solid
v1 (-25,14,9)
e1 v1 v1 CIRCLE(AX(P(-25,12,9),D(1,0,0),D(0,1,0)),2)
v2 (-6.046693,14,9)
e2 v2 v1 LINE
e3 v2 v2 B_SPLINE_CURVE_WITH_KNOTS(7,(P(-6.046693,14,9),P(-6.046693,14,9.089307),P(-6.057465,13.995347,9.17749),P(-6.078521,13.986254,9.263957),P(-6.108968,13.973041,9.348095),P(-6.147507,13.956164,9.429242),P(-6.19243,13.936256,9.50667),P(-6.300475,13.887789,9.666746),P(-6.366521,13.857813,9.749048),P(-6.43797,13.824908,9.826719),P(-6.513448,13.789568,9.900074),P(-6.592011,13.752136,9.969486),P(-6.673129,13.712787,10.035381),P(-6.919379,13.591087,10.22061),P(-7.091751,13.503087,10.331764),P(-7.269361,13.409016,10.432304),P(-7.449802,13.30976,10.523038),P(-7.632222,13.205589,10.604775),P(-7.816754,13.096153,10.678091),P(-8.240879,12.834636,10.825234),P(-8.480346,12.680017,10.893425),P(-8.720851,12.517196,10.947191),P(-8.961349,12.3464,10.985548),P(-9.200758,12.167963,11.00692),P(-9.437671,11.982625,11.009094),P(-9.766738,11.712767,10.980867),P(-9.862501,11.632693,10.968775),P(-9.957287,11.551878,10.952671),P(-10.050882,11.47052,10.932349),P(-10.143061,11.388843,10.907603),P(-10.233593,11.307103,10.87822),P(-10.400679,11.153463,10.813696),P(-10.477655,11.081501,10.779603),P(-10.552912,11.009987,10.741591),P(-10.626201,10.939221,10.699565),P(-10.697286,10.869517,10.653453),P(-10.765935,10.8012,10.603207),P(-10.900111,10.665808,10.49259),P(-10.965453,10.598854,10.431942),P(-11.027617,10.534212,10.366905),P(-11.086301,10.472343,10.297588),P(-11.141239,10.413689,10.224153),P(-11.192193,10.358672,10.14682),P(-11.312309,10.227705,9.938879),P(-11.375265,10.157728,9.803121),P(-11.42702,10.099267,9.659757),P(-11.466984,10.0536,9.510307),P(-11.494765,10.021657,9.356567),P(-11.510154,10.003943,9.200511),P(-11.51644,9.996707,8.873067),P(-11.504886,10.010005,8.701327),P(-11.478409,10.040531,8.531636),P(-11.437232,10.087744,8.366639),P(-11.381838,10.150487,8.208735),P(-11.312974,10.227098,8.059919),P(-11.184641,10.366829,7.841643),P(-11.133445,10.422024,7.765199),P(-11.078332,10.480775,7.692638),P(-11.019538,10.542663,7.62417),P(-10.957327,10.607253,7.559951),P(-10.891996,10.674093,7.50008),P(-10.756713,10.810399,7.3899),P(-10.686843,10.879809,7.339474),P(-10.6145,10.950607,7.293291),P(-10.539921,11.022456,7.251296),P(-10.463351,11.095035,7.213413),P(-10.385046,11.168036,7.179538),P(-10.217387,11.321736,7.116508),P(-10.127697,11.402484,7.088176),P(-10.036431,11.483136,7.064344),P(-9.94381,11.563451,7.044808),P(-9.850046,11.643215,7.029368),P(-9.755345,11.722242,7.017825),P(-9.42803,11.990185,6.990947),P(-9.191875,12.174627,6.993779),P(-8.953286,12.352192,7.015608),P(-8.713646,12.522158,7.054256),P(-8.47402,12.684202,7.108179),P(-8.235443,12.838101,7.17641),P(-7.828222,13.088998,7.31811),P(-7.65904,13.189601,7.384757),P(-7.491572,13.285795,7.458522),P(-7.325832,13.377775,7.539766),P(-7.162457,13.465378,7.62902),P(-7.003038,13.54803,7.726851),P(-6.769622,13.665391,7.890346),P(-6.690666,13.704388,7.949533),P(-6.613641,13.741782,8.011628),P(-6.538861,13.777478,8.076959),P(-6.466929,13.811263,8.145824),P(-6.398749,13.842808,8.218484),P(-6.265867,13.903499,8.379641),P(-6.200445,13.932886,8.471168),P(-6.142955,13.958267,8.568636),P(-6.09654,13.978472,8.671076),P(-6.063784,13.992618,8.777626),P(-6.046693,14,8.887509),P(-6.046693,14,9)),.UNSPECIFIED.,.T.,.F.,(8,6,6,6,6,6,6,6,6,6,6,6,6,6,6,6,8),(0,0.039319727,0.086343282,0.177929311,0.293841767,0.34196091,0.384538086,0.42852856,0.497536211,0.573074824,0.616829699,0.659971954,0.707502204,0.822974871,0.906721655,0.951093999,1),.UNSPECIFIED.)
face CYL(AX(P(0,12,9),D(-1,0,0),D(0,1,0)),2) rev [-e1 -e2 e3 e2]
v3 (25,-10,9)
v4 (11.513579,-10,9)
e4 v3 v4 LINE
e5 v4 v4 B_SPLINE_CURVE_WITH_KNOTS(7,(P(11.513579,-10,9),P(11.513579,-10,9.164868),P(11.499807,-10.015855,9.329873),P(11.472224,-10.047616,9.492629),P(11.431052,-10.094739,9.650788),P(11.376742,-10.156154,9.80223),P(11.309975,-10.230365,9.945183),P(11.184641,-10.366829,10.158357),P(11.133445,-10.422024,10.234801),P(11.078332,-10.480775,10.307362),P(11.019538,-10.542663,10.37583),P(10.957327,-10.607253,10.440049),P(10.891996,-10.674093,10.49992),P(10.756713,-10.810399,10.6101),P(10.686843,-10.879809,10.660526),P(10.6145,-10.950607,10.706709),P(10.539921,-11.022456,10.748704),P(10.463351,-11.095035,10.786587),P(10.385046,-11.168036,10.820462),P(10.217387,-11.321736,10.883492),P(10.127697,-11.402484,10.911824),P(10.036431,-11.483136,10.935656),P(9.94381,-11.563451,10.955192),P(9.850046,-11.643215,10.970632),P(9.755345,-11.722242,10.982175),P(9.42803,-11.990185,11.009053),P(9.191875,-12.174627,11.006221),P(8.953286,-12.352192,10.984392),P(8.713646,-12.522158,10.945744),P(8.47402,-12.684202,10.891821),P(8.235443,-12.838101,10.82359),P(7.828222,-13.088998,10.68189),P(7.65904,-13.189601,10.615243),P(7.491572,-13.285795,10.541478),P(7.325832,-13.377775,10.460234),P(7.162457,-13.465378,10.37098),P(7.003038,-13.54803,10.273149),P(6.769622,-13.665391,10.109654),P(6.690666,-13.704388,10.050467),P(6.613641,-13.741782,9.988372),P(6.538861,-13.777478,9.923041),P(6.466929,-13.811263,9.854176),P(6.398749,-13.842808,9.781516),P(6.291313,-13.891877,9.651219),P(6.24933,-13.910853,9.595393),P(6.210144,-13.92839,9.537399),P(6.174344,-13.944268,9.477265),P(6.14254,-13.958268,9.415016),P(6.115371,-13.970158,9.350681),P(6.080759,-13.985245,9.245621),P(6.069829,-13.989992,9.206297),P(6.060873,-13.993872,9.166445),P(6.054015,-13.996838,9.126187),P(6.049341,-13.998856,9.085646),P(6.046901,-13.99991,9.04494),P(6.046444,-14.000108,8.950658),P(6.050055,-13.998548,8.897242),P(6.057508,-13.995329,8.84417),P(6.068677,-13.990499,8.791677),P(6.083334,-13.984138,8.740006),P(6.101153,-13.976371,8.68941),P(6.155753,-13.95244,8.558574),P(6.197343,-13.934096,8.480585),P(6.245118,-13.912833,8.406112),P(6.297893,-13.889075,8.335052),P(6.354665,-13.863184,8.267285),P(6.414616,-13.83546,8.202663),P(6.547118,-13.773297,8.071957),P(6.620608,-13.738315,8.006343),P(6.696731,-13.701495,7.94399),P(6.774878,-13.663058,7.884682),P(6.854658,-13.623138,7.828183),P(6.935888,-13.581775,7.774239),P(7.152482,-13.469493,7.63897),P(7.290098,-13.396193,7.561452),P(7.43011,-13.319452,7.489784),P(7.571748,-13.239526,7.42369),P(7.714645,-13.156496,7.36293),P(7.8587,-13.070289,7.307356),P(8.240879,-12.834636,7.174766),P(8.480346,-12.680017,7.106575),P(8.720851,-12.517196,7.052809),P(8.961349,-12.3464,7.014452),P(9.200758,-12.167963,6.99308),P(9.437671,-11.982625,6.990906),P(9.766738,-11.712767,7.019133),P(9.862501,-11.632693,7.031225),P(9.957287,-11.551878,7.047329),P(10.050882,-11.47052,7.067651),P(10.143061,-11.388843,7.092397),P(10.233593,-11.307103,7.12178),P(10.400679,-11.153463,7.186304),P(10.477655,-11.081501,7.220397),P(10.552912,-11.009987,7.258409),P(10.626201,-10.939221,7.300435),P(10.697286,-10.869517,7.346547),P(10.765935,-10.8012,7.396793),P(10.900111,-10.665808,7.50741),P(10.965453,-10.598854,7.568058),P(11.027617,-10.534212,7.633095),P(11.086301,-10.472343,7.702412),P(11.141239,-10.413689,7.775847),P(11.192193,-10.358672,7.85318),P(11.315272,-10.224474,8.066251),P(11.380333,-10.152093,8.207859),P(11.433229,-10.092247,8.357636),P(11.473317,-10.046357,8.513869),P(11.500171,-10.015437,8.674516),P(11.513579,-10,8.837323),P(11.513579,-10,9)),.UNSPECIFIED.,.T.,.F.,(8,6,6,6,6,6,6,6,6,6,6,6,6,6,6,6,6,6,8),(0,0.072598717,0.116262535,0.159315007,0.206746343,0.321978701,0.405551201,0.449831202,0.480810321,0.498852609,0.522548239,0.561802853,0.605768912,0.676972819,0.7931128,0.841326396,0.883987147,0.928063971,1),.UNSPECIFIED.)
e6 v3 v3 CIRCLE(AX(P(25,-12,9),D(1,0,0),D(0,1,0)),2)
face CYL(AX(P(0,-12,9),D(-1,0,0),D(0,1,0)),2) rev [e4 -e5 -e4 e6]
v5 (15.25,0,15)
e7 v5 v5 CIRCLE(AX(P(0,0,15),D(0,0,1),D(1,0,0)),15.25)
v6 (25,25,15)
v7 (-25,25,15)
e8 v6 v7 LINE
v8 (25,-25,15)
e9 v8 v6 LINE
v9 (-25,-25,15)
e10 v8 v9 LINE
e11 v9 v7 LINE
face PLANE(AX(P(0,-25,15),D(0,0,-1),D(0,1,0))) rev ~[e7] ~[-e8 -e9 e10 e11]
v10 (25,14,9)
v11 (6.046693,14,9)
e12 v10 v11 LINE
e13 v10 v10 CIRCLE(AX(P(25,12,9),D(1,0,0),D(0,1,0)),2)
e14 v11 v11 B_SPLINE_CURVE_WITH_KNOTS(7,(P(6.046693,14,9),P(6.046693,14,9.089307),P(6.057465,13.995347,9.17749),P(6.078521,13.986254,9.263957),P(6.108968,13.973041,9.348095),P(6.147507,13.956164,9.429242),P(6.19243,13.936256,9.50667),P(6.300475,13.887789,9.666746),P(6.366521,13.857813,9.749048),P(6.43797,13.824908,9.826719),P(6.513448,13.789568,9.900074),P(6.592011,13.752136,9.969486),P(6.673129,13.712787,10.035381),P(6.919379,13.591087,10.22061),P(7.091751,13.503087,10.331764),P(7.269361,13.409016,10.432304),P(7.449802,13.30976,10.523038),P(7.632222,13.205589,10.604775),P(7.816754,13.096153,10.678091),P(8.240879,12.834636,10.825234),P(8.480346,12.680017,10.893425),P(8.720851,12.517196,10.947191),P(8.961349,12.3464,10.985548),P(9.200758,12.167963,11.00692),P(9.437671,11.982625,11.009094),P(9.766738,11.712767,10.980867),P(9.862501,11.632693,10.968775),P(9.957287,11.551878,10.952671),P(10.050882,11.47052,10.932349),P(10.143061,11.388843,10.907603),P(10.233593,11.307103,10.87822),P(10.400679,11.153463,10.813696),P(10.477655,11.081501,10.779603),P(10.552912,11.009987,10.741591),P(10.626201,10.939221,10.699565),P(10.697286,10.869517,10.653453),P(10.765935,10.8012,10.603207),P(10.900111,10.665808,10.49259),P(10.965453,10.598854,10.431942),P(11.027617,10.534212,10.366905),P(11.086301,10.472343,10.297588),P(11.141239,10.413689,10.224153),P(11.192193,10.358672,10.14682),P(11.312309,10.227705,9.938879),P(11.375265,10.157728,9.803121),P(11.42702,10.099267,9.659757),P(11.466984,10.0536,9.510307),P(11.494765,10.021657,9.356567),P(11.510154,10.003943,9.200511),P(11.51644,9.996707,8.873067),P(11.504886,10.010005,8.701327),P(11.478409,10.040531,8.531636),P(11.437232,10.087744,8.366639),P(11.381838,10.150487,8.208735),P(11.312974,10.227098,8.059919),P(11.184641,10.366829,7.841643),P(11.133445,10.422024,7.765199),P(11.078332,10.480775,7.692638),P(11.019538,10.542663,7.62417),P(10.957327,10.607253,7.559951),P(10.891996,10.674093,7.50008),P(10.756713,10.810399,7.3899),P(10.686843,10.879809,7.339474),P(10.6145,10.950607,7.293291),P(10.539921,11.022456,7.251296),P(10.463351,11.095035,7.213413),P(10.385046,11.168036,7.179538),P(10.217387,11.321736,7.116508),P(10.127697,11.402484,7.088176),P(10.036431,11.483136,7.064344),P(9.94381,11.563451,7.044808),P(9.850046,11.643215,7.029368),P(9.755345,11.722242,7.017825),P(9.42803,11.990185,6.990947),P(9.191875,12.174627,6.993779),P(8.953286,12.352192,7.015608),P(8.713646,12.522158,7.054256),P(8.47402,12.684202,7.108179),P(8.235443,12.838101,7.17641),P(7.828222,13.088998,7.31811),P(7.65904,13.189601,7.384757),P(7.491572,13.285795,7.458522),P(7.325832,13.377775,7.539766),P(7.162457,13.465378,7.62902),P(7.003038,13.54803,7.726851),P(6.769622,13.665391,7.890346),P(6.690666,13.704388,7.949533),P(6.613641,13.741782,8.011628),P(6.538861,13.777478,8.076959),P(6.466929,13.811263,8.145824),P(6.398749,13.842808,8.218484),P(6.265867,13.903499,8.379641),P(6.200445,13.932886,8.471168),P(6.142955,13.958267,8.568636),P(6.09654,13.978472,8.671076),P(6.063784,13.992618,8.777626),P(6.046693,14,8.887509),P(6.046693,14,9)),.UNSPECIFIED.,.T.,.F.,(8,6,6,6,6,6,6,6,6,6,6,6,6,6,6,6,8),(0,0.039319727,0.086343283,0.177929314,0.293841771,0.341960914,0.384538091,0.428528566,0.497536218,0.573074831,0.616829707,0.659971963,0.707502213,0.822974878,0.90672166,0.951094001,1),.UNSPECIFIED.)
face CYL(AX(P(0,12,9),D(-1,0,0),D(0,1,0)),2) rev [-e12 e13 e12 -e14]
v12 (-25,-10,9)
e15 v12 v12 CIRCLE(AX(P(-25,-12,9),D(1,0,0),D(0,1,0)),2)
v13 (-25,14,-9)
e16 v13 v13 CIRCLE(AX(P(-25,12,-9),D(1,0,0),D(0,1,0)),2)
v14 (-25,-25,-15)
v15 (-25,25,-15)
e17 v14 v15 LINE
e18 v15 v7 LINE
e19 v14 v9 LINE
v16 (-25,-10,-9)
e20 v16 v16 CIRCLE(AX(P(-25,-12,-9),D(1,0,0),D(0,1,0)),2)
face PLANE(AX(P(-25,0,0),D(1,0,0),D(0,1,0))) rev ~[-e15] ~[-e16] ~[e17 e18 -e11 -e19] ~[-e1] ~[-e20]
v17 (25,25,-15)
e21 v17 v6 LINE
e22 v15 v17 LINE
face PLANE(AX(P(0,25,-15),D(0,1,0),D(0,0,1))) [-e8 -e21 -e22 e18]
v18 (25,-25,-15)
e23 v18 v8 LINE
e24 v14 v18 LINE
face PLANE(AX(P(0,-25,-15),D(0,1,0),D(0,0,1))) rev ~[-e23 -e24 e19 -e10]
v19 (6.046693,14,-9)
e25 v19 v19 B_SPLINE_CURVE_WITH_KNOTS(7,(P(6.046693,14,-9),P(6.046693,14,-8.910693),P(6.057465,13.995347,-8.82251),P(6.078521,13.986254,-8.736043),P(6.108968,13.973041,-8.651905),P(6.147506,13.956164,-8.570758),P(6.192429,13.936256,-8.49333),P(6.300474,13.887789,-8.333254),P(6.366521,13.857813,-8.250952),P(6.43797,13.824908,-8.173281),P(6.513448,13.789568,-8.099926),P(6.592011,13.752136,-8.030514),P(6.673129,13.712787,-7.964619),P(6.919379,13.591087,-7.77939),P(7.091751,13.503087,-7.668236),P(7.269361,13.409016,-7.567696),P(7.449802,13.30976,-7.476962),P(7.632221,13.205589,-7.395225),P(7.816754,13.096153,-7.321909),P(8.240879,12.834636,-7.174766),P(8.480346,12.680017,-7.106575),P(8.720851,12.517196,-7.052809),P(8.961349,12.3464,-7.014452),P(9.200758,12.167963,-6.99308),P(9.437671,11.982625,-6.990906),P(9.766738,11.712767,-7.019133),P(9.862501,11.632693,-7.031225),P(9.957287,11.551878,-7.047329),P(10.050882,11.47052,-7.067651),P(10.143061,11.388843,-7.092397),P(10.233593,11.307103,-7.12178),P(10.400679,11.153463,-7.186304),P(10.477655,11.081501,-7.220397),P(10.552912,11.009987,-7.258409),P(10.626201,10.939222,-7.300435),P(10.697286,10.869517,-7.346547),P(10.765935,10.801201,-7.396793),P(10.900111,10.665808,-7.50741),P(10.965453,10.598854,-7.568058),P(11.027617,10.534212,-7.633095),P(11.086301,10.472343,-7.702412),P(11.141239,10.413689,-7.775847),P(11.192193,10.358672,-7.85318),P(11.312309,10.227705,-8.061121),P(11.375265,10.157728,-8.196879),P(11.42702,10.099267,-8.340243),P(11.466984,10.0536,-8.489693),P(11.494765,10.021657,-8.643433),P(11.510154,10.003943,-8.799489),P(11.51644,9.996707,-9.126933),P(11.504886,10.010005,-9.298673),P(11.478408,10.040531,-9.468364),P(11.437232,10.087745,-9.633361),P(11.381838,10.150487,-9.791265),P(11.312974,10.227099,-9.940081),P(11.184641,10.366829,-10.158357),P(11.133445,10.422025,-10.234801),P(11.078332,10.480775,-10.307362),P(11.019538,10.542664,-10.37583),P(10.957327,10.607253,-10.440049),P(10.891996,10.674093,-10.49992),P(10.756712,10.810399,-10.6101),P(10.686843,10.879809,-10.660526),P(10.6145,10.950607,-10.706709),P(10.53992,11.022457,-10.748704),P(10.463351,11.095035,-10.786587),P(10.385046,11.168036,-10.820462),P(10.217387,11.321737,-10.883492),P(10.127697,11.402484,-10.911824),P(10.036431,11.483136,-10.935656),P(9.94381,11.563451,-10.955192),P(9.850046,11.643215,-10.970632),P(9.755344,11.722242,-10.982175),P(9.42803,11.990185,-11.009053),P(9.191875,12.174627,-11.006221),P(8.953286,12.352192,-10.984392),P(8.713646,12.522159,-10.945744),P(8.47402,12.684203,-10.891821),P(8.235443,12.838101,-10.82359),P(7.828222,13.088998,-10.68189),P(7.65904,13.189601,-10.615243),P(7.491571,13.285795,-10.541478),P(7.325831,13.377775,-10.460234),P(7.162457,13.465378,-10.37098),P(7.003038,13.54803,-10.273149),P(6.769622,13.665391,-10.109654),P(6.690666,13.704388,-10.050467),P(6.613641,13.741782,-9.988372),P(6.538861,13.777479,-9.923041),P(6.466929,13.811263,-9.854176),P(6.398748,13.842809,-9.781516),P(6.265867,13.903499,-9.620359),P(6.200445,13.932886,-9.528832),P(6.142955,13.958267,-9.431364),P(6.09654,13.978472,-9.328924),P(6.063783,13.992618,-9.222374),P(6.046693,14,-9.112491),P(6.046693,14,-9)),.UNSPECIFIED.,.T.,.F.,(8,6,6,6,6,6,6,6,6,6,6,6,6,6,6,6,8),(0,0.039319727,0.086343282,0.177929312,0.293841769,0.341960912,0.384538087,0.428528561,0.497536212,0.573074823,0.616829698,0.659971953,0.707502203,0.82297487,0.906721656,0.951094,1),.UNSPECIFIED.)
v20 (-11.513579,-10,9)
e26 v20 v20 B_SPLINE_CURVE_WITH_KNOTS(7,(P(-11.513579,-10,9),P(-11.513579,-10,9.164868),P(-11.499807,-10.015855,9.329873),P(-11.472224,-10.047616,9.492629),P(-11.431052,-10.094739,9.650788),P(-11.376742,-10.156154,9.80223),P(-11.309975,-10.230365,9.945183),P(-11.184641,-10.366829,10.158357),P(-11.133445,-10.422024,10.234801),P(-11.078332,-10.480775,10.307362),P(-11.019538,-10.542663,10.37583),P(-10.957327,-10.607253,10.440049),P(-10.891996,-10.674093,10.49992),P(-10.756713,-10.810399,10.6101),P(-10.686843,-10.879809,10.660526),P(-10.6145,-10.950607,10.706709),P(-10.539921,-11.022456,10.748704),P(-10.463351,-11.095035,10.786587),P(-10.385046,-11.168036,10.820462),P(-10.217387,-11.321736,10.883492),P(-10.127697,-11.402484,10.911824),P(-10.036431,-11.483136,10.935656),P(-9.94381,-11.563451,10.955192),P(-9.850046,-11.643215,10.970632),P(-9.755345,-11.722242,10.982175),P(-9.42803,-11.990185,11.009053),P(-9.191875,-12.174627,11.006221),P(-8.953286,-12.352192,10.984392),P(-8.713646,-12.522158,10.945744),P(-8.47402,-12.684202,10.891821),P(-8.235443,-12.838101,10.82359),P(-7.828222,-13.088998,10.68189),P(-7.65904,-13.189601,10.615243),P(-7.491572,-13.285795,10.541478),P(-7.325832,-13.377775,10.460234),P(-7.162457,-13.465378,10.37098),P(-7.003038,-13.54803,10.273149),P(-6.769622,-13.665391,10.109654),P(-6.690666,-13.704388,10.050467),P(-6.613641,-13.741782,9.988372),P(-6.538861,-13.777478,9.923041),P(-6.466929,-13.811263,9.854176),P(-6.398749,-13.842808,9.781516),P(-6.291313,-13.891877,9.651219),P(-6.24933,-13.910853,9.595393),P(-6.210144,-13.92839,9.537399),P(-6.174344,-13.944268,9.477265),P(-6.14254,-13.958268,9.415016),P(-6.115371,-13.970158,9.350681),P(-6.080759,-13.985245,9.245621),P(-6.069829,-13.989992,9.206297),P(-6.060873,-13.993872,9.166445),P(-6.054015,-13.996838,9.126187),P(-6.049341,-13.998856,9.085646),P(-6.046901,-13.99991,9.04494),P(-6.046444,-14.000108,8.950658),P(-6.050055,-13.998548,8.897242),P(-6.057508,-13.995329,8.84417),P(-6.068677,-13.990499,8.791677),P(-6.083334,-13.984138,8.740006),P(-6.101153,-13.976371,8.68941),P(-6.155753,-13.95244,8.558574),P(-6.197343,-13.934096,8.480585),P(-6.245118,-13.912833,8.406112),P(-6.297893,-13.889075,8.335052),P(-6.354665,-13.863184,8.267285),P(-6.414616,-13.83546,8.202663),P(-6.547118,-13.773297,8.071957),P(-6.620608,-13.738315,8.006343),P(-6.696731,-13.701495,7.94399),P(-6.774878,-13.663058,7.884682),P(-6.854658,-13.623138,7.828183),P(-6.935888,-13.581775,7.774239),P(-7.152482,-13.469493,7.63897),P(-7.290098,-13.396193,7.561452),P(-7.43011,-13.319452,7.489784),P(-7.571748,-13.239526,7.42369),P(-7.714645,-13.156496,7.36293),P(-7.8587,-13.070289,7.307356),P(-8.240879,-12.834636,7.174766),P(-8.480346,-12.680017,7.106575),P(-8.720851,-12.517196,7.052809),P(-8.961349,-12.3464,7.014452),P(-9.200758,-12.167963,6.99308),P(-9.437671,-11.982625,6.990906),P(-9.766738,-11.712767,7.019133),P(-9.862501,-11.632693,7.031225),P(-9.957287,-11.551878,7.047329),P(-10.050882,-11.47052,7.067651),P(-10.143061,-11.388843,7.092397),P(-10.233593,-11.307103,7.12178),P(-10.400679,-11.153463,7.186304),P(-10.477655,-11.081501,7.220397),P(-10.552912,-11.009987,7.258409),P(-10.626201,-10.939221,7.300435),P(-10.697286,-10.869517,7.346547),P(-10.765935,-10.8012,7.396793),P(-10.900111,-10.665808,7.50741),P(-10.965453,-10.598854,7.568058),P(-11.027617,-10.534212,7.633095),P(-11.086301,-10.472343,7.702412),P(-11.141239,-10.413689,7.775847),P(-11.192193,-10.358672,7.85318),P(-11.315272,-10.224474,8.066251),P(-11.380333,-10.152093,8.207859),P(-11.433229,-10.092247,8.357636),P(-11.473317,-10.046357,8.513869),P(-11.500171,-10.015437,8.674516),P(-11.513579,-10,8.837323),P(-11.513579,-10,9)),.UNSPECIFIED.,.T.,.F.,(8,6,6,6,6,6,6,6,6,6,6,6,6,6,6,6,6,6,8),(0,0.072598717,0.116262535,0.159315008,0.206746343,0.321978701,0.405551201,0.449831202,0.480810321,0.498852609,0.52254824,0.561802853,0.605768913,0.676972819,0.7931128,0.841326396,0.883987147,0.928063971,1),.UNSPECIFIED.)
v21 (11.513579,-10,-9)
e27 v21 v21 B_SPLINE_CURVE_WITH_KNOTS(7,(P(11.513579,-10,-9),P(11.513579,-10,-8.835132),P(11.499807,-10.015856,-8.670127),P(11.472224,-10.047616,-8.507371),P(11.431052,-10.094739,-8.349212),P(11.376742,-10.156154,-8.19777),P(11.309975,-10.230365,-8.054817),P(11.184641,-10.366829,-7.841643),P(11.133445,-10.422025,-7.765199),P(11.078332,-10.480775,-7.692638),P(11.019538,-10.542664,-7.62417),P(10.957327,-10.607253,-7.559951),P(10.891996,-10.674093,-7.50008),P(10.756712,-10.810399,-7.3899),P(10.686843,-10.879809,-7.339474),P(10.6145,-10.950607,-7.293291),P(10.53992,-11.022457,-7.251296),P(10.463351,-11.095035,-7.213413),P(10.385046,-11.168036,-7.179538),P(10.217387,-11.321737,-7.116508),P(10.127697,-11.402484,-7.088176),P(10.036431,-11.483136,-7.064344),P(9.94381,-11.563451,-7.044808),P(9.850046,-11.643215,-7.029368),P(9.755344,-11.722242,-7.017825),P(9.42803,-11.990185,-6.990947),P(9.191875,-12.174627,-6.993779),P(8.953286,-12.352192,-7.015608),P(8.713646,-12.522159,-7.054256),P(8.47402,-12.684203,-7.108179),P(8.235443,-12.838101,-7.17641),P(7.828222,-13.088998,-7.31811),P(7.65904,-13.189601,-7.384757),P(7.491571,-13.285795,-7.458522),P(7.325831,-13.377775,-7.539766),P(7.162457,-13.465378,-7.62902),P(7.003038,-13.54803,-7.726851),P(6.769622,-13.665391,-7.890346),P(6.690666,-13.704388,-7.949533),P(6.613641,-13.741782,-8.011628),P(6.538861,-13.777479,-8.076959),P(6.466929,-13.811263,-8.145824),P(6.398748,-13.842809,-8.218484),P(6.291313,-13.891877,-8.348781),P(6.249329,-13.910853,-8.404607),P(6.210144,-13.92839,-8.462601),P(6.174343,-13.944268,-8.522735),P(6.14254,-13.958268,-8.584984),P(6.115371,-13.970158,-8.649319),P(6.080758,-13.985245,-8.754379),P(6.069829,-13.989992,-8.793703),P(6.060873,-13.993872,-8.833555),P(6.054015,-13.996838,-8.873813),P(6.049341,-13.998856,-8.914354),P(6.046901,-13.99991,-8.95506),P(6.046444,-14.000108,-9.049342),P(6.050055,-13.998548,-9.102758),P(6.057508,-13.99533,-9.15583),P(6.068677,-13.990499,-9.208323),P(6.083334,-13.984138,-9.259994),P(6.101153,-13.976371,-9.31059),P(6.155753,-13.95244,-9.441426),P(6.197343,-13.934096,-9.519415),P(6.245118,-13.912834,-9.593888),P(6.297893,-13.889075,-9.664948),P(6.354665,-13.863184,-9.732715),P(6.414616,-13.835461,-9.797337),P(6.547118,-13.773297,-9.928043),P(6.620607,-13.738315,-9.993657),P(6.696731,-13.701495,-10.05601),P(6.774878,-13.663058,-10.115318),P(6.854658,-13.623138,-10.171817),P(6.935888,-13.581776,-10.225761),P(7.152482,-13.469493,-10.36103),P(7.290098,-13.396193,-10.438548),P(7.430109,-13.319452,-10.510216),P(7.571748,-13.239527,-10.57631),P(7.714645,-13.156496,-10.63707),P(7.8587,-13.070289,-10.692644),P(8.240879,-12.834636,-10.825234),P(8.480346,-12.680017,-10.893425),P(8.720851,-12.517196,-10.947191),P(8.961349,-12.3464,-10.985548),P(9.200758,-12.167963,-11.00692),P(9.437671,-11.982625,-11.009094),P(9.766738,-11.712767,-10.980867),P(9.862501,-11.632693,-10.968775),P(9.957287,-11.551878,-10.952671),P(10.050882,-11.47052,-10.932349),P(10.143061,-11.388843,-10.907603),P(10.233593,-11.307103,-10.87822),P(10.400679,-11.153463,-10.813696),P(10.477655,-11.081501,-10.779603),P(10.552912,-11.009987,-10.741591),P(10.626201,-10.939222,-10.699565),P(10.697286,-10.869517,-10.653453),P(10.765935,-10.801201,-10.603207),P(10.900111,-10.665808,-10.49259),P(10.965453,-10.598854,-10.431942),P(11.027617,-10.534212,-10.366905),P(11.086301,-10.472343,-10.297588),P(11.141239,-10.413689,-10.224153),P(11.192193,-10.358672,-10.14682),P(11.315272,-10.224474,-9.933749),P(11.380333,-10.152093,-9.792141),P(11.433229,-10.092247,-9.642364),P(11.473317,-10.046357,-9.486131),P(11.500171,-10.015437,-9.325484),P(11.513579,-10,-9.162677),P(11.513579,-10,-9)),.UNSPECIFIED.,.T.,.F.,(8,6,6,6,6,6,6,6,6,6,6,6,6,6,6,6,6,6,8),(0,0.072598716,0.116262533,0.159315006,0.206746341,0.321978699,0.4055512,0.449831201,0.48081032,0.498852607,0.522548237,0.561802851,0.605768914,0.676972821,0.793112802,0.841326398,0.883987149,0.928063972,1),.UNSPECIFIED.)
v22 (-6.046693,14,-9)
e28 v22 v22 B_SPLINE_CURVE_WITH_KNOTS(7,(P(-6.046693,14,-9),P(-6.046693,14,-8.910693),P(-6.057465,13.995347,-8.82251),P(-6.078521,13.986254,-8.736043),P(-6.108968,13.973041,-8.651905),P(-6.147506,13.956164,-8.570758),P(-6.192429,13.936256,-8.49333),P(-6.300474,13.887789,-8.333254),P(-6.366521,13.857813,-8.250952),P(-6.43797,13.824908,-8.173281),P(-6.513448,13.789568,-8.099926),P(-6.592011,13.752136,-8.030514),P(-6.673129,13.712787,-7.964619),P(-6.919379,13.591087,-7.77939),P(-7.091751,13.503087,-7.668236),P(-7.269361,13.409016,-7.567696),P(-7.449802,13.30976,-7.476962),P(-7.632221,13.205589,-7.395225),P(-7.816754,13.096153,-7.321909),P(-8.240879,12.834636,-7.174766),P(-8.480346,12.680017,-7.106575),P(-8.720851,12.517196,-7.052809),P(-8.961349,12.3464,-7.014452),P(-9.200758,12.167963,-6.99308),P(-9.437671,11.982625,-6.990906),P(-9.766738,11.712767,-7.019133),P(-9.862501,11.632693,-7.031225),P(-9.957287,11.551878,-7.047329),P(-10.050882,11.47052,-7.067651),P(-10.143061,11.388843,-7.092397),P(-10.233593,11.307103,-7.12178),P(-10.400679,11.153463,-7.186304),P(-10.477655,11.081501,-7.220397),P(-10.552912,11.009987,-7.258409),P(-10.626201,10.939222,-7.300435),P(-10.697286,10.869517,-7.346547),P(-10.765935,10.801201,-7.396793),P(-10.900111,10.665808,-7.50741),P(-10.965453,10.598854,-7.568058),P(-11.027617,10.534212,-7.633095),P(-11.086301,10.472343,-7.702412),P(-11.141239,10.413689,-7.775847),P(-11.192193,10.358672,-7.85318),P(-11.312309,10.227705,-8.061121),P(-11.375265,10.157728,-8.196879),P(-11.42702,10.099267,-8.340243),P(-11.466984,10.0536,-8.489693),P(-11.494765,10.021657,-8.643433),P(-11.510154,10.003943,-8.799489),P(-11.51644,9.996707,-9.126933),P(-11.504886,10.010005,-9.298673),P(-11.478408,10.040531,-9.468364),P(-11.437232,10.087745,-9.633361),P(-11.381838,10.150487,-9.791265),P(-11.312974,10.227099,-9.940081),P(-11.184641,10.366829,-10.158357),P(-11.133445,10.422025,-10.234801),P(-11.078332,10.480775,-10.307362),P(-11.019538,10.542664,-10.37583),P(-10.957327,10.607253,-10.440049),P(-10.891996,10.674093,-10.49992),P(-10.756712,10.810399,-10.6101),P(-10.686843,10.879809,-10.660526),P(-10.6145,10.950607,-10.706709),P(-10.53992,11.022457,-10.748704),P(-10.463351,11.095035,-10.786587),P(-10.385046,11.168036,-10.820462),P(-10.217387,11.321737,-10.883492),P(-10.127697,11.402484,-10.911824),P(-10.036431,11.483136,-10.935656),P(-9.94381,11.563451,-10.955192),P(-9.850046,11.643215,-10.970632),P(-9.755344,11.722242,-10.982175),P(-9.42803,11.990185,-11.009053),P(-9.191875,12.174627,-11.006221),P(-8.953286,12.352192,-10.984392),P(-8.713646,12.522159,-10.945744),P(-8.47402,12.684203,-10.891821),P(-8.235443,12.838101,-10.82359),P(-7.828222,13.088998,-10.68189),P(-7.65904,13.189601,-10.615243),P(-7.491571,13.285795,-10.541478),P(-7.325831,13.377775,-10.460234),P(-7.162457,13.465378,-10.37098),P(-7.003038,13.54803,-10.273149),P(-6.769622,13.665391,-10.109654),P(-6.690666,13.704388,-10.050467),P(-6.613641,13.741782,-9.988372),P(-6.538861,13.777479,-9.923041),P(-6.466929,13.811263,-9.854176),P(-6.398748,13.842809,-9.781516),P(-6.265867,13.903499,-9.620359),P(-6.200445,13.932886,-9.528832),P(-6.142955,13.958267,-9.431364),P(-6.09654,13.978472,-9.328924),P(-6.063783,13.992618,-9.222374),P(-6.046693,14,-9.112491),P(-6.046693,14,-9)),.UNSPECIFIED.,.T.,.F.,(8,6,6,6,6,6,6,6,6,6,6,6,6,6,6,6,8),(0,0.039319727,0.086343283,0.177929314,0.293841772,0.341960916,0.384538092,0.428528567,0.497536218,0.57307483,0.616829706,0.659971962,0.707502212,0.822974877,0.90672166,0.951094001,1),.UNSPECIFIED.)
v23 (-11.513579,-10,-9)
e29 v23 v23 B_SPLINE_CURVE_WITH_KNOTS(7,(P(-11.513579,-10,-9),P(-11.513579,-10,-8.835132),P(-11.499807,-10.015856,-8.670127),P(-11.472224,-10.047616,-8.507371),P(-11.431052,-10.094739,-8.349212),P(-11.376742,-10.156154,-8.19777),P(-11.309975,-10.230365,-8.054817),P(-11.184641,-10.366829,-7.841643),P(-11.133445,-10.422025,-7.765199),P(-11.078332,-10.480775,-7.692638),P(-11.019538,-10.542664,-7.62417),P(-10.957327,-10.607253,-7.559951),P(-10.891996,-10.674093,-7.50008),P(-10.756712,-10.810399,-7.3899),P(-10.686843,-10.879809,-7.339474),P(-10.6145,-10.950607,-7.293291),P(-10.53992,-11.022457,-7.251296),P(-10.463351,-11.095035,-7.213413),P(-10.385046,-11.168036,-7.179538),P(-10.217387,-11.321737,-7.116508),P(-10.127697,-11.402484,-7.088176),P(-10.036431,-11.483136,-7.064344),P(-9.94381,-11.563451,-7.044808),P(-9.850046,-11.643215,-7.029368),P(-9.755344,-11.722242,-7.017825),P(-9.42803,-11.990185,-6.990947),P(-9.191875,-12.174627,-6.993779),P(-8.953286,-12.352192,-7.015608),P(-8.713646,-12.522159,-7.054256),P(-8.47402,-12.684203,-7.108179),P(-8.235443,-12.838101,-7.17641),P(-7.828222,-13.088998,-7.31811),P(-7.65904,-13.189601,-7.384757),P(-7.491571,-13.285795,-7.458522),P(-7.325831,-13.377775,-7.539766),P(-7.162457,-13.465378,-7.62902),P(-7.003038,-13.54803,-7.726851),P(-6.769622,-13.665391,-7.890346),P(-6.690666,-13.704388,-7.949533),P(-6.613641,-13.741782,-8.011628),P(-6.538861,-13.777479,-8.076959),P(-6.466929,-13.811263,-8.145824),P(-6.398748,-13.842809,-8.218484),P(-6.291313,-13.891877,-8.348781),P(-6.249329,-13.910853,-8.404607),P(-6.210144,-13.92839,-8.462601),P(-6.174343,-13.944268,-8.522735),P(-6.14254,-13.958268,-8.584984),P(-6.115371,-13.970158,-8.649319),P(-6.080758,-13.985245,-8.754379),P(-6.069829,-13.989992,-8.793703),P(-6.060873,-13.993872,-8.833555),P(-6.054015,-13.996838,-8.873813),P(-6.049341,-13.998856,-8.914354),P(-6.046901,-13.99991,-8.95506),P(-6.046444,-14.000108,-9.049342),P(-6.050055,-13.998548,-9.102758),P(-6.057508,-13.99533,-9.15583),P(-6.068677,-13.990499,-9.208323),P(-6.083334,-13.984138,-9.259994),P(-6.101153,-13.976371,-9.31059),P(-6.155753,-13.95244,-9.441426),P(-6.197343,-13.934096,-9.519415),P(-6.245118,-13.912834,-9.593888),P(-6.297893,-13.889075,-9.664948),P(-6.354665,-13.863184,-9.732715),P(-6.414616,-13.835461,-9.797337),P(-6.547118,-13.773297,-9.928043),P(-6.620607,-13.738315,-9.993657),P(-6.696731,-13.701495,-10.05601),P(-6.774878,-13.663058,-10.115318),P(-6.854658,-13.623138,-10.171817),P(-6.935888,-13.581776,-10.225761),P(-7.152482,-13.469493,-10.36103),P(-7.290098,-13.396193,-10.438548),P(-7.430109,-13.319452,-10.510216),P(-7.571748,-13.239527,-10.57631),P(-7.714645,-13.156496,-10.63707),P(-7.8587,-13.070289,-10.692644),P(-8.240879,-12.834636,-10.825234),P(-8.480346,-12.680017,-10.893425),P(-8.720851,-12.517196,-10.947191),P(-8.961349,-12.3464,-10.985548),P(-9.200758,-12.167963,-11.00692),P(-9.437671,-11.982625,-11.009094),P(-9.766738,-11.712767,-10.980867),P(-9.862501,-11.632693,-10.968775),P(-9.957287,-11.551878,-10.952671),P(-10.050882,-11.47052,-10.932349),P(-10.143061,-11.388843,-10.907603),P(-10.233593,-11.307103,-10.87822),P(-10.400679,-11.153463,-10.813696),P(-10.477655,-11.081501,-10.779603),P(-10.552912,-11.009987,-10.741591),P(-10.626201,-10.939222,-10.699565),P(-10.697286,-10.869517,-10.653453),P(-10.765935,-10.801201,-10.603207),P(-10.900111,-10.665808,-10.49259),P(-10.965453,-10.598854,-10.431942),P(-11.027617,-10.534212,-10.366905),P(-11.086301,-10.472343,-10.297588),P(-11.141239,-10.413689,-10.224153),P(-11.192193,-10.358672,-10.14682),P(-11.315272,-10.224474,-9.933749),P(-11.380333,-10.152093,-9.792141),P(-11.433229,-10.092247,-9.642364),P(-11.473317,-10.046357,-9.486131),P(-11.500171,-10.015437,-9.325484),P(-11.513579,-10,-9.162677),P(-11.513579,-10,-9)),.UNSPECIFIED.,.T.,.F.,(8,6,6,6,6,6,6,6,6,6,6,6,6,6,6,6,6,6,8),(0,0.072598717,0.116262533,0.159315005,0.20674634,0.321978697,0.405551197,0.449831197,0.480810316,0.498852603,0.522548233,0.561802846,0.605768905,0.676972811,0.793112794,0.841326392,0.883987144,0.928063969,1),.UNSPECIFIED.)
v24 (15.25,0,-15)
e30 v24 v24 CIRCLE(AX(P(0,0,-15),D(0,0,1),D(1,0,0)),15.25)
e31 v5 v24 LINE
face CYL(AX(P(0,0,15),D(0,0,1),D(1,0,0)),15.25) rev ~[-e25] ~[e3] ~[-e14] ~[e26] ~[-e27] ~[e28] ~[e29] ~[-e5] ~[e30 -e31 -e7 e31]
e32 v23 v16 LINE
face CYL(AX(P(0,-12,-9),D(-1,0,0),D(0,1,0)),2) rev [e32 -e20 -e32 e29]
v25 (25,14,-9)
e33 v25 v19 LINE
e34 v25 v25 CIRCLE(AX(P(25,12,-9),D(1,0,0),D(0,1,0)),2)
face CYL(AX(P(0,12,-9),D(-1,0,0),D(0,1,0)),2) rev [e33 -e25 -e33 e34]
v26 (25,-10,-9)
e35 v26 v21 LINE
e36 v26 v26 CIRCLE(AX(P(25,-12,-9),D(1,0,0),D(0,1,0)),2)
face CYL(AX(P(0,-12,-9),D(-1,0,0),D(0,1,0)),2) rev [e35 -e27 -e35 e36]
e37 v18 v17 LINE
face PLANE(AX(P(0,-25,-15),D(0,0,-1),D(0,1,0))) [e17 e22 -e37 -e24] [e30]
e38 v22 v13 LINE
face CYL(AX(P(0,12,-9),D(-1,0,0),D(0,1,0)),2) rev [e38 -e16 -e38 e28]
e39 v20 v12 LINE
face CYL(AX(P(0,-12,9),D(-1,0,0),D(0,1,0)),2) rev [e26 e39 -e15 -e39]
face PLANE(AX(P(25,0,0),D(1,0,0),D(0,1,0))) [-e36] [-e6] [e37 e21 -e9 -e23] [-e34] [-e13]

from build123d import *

# Parameters (mm, degrees)
F0_W     = 50
F0_H     = 30
F0_R     = 2
F1_DEPTH = 25
F2_R     = 15.25
F3_DEPTH = 30.001


# Not quite as in the source:
# - a feature names something its author has since deleted; it is built from what else it names


with BuildPart() as f1:
    # F0 (on Right) → F1 (new body, symmetric)
    with BuildSketch(Plane.YZ):
        Rectangle(F0_W, F0_H)
        with Locations((-12.0000001043, -9)):
            Circle(F0_R, mode=Mode.SUBTRACT)
        with Locations((12.0000001043, -9)):
            Circle(F0_R, mode=Mode.SUBTRACT)
        with Locations((-12, 9)):
            Circle(F0_R, mode=Mode.SUBTRACT)
        with Locations((12, 9)):
            Circle(F0_R, mode=Mode.SUBTRACT)
    extrude(amount=F1_DEPTH, both=True)

    # F2 (on face) → F3 (cut, through all)
    with BuildSketch(Plane.XY.offset(15)):
        Circle(F2_R)
    extrude(amount=-F3_DEPTH, mode=Mode.SUBTRACT)


solid = f1.part
